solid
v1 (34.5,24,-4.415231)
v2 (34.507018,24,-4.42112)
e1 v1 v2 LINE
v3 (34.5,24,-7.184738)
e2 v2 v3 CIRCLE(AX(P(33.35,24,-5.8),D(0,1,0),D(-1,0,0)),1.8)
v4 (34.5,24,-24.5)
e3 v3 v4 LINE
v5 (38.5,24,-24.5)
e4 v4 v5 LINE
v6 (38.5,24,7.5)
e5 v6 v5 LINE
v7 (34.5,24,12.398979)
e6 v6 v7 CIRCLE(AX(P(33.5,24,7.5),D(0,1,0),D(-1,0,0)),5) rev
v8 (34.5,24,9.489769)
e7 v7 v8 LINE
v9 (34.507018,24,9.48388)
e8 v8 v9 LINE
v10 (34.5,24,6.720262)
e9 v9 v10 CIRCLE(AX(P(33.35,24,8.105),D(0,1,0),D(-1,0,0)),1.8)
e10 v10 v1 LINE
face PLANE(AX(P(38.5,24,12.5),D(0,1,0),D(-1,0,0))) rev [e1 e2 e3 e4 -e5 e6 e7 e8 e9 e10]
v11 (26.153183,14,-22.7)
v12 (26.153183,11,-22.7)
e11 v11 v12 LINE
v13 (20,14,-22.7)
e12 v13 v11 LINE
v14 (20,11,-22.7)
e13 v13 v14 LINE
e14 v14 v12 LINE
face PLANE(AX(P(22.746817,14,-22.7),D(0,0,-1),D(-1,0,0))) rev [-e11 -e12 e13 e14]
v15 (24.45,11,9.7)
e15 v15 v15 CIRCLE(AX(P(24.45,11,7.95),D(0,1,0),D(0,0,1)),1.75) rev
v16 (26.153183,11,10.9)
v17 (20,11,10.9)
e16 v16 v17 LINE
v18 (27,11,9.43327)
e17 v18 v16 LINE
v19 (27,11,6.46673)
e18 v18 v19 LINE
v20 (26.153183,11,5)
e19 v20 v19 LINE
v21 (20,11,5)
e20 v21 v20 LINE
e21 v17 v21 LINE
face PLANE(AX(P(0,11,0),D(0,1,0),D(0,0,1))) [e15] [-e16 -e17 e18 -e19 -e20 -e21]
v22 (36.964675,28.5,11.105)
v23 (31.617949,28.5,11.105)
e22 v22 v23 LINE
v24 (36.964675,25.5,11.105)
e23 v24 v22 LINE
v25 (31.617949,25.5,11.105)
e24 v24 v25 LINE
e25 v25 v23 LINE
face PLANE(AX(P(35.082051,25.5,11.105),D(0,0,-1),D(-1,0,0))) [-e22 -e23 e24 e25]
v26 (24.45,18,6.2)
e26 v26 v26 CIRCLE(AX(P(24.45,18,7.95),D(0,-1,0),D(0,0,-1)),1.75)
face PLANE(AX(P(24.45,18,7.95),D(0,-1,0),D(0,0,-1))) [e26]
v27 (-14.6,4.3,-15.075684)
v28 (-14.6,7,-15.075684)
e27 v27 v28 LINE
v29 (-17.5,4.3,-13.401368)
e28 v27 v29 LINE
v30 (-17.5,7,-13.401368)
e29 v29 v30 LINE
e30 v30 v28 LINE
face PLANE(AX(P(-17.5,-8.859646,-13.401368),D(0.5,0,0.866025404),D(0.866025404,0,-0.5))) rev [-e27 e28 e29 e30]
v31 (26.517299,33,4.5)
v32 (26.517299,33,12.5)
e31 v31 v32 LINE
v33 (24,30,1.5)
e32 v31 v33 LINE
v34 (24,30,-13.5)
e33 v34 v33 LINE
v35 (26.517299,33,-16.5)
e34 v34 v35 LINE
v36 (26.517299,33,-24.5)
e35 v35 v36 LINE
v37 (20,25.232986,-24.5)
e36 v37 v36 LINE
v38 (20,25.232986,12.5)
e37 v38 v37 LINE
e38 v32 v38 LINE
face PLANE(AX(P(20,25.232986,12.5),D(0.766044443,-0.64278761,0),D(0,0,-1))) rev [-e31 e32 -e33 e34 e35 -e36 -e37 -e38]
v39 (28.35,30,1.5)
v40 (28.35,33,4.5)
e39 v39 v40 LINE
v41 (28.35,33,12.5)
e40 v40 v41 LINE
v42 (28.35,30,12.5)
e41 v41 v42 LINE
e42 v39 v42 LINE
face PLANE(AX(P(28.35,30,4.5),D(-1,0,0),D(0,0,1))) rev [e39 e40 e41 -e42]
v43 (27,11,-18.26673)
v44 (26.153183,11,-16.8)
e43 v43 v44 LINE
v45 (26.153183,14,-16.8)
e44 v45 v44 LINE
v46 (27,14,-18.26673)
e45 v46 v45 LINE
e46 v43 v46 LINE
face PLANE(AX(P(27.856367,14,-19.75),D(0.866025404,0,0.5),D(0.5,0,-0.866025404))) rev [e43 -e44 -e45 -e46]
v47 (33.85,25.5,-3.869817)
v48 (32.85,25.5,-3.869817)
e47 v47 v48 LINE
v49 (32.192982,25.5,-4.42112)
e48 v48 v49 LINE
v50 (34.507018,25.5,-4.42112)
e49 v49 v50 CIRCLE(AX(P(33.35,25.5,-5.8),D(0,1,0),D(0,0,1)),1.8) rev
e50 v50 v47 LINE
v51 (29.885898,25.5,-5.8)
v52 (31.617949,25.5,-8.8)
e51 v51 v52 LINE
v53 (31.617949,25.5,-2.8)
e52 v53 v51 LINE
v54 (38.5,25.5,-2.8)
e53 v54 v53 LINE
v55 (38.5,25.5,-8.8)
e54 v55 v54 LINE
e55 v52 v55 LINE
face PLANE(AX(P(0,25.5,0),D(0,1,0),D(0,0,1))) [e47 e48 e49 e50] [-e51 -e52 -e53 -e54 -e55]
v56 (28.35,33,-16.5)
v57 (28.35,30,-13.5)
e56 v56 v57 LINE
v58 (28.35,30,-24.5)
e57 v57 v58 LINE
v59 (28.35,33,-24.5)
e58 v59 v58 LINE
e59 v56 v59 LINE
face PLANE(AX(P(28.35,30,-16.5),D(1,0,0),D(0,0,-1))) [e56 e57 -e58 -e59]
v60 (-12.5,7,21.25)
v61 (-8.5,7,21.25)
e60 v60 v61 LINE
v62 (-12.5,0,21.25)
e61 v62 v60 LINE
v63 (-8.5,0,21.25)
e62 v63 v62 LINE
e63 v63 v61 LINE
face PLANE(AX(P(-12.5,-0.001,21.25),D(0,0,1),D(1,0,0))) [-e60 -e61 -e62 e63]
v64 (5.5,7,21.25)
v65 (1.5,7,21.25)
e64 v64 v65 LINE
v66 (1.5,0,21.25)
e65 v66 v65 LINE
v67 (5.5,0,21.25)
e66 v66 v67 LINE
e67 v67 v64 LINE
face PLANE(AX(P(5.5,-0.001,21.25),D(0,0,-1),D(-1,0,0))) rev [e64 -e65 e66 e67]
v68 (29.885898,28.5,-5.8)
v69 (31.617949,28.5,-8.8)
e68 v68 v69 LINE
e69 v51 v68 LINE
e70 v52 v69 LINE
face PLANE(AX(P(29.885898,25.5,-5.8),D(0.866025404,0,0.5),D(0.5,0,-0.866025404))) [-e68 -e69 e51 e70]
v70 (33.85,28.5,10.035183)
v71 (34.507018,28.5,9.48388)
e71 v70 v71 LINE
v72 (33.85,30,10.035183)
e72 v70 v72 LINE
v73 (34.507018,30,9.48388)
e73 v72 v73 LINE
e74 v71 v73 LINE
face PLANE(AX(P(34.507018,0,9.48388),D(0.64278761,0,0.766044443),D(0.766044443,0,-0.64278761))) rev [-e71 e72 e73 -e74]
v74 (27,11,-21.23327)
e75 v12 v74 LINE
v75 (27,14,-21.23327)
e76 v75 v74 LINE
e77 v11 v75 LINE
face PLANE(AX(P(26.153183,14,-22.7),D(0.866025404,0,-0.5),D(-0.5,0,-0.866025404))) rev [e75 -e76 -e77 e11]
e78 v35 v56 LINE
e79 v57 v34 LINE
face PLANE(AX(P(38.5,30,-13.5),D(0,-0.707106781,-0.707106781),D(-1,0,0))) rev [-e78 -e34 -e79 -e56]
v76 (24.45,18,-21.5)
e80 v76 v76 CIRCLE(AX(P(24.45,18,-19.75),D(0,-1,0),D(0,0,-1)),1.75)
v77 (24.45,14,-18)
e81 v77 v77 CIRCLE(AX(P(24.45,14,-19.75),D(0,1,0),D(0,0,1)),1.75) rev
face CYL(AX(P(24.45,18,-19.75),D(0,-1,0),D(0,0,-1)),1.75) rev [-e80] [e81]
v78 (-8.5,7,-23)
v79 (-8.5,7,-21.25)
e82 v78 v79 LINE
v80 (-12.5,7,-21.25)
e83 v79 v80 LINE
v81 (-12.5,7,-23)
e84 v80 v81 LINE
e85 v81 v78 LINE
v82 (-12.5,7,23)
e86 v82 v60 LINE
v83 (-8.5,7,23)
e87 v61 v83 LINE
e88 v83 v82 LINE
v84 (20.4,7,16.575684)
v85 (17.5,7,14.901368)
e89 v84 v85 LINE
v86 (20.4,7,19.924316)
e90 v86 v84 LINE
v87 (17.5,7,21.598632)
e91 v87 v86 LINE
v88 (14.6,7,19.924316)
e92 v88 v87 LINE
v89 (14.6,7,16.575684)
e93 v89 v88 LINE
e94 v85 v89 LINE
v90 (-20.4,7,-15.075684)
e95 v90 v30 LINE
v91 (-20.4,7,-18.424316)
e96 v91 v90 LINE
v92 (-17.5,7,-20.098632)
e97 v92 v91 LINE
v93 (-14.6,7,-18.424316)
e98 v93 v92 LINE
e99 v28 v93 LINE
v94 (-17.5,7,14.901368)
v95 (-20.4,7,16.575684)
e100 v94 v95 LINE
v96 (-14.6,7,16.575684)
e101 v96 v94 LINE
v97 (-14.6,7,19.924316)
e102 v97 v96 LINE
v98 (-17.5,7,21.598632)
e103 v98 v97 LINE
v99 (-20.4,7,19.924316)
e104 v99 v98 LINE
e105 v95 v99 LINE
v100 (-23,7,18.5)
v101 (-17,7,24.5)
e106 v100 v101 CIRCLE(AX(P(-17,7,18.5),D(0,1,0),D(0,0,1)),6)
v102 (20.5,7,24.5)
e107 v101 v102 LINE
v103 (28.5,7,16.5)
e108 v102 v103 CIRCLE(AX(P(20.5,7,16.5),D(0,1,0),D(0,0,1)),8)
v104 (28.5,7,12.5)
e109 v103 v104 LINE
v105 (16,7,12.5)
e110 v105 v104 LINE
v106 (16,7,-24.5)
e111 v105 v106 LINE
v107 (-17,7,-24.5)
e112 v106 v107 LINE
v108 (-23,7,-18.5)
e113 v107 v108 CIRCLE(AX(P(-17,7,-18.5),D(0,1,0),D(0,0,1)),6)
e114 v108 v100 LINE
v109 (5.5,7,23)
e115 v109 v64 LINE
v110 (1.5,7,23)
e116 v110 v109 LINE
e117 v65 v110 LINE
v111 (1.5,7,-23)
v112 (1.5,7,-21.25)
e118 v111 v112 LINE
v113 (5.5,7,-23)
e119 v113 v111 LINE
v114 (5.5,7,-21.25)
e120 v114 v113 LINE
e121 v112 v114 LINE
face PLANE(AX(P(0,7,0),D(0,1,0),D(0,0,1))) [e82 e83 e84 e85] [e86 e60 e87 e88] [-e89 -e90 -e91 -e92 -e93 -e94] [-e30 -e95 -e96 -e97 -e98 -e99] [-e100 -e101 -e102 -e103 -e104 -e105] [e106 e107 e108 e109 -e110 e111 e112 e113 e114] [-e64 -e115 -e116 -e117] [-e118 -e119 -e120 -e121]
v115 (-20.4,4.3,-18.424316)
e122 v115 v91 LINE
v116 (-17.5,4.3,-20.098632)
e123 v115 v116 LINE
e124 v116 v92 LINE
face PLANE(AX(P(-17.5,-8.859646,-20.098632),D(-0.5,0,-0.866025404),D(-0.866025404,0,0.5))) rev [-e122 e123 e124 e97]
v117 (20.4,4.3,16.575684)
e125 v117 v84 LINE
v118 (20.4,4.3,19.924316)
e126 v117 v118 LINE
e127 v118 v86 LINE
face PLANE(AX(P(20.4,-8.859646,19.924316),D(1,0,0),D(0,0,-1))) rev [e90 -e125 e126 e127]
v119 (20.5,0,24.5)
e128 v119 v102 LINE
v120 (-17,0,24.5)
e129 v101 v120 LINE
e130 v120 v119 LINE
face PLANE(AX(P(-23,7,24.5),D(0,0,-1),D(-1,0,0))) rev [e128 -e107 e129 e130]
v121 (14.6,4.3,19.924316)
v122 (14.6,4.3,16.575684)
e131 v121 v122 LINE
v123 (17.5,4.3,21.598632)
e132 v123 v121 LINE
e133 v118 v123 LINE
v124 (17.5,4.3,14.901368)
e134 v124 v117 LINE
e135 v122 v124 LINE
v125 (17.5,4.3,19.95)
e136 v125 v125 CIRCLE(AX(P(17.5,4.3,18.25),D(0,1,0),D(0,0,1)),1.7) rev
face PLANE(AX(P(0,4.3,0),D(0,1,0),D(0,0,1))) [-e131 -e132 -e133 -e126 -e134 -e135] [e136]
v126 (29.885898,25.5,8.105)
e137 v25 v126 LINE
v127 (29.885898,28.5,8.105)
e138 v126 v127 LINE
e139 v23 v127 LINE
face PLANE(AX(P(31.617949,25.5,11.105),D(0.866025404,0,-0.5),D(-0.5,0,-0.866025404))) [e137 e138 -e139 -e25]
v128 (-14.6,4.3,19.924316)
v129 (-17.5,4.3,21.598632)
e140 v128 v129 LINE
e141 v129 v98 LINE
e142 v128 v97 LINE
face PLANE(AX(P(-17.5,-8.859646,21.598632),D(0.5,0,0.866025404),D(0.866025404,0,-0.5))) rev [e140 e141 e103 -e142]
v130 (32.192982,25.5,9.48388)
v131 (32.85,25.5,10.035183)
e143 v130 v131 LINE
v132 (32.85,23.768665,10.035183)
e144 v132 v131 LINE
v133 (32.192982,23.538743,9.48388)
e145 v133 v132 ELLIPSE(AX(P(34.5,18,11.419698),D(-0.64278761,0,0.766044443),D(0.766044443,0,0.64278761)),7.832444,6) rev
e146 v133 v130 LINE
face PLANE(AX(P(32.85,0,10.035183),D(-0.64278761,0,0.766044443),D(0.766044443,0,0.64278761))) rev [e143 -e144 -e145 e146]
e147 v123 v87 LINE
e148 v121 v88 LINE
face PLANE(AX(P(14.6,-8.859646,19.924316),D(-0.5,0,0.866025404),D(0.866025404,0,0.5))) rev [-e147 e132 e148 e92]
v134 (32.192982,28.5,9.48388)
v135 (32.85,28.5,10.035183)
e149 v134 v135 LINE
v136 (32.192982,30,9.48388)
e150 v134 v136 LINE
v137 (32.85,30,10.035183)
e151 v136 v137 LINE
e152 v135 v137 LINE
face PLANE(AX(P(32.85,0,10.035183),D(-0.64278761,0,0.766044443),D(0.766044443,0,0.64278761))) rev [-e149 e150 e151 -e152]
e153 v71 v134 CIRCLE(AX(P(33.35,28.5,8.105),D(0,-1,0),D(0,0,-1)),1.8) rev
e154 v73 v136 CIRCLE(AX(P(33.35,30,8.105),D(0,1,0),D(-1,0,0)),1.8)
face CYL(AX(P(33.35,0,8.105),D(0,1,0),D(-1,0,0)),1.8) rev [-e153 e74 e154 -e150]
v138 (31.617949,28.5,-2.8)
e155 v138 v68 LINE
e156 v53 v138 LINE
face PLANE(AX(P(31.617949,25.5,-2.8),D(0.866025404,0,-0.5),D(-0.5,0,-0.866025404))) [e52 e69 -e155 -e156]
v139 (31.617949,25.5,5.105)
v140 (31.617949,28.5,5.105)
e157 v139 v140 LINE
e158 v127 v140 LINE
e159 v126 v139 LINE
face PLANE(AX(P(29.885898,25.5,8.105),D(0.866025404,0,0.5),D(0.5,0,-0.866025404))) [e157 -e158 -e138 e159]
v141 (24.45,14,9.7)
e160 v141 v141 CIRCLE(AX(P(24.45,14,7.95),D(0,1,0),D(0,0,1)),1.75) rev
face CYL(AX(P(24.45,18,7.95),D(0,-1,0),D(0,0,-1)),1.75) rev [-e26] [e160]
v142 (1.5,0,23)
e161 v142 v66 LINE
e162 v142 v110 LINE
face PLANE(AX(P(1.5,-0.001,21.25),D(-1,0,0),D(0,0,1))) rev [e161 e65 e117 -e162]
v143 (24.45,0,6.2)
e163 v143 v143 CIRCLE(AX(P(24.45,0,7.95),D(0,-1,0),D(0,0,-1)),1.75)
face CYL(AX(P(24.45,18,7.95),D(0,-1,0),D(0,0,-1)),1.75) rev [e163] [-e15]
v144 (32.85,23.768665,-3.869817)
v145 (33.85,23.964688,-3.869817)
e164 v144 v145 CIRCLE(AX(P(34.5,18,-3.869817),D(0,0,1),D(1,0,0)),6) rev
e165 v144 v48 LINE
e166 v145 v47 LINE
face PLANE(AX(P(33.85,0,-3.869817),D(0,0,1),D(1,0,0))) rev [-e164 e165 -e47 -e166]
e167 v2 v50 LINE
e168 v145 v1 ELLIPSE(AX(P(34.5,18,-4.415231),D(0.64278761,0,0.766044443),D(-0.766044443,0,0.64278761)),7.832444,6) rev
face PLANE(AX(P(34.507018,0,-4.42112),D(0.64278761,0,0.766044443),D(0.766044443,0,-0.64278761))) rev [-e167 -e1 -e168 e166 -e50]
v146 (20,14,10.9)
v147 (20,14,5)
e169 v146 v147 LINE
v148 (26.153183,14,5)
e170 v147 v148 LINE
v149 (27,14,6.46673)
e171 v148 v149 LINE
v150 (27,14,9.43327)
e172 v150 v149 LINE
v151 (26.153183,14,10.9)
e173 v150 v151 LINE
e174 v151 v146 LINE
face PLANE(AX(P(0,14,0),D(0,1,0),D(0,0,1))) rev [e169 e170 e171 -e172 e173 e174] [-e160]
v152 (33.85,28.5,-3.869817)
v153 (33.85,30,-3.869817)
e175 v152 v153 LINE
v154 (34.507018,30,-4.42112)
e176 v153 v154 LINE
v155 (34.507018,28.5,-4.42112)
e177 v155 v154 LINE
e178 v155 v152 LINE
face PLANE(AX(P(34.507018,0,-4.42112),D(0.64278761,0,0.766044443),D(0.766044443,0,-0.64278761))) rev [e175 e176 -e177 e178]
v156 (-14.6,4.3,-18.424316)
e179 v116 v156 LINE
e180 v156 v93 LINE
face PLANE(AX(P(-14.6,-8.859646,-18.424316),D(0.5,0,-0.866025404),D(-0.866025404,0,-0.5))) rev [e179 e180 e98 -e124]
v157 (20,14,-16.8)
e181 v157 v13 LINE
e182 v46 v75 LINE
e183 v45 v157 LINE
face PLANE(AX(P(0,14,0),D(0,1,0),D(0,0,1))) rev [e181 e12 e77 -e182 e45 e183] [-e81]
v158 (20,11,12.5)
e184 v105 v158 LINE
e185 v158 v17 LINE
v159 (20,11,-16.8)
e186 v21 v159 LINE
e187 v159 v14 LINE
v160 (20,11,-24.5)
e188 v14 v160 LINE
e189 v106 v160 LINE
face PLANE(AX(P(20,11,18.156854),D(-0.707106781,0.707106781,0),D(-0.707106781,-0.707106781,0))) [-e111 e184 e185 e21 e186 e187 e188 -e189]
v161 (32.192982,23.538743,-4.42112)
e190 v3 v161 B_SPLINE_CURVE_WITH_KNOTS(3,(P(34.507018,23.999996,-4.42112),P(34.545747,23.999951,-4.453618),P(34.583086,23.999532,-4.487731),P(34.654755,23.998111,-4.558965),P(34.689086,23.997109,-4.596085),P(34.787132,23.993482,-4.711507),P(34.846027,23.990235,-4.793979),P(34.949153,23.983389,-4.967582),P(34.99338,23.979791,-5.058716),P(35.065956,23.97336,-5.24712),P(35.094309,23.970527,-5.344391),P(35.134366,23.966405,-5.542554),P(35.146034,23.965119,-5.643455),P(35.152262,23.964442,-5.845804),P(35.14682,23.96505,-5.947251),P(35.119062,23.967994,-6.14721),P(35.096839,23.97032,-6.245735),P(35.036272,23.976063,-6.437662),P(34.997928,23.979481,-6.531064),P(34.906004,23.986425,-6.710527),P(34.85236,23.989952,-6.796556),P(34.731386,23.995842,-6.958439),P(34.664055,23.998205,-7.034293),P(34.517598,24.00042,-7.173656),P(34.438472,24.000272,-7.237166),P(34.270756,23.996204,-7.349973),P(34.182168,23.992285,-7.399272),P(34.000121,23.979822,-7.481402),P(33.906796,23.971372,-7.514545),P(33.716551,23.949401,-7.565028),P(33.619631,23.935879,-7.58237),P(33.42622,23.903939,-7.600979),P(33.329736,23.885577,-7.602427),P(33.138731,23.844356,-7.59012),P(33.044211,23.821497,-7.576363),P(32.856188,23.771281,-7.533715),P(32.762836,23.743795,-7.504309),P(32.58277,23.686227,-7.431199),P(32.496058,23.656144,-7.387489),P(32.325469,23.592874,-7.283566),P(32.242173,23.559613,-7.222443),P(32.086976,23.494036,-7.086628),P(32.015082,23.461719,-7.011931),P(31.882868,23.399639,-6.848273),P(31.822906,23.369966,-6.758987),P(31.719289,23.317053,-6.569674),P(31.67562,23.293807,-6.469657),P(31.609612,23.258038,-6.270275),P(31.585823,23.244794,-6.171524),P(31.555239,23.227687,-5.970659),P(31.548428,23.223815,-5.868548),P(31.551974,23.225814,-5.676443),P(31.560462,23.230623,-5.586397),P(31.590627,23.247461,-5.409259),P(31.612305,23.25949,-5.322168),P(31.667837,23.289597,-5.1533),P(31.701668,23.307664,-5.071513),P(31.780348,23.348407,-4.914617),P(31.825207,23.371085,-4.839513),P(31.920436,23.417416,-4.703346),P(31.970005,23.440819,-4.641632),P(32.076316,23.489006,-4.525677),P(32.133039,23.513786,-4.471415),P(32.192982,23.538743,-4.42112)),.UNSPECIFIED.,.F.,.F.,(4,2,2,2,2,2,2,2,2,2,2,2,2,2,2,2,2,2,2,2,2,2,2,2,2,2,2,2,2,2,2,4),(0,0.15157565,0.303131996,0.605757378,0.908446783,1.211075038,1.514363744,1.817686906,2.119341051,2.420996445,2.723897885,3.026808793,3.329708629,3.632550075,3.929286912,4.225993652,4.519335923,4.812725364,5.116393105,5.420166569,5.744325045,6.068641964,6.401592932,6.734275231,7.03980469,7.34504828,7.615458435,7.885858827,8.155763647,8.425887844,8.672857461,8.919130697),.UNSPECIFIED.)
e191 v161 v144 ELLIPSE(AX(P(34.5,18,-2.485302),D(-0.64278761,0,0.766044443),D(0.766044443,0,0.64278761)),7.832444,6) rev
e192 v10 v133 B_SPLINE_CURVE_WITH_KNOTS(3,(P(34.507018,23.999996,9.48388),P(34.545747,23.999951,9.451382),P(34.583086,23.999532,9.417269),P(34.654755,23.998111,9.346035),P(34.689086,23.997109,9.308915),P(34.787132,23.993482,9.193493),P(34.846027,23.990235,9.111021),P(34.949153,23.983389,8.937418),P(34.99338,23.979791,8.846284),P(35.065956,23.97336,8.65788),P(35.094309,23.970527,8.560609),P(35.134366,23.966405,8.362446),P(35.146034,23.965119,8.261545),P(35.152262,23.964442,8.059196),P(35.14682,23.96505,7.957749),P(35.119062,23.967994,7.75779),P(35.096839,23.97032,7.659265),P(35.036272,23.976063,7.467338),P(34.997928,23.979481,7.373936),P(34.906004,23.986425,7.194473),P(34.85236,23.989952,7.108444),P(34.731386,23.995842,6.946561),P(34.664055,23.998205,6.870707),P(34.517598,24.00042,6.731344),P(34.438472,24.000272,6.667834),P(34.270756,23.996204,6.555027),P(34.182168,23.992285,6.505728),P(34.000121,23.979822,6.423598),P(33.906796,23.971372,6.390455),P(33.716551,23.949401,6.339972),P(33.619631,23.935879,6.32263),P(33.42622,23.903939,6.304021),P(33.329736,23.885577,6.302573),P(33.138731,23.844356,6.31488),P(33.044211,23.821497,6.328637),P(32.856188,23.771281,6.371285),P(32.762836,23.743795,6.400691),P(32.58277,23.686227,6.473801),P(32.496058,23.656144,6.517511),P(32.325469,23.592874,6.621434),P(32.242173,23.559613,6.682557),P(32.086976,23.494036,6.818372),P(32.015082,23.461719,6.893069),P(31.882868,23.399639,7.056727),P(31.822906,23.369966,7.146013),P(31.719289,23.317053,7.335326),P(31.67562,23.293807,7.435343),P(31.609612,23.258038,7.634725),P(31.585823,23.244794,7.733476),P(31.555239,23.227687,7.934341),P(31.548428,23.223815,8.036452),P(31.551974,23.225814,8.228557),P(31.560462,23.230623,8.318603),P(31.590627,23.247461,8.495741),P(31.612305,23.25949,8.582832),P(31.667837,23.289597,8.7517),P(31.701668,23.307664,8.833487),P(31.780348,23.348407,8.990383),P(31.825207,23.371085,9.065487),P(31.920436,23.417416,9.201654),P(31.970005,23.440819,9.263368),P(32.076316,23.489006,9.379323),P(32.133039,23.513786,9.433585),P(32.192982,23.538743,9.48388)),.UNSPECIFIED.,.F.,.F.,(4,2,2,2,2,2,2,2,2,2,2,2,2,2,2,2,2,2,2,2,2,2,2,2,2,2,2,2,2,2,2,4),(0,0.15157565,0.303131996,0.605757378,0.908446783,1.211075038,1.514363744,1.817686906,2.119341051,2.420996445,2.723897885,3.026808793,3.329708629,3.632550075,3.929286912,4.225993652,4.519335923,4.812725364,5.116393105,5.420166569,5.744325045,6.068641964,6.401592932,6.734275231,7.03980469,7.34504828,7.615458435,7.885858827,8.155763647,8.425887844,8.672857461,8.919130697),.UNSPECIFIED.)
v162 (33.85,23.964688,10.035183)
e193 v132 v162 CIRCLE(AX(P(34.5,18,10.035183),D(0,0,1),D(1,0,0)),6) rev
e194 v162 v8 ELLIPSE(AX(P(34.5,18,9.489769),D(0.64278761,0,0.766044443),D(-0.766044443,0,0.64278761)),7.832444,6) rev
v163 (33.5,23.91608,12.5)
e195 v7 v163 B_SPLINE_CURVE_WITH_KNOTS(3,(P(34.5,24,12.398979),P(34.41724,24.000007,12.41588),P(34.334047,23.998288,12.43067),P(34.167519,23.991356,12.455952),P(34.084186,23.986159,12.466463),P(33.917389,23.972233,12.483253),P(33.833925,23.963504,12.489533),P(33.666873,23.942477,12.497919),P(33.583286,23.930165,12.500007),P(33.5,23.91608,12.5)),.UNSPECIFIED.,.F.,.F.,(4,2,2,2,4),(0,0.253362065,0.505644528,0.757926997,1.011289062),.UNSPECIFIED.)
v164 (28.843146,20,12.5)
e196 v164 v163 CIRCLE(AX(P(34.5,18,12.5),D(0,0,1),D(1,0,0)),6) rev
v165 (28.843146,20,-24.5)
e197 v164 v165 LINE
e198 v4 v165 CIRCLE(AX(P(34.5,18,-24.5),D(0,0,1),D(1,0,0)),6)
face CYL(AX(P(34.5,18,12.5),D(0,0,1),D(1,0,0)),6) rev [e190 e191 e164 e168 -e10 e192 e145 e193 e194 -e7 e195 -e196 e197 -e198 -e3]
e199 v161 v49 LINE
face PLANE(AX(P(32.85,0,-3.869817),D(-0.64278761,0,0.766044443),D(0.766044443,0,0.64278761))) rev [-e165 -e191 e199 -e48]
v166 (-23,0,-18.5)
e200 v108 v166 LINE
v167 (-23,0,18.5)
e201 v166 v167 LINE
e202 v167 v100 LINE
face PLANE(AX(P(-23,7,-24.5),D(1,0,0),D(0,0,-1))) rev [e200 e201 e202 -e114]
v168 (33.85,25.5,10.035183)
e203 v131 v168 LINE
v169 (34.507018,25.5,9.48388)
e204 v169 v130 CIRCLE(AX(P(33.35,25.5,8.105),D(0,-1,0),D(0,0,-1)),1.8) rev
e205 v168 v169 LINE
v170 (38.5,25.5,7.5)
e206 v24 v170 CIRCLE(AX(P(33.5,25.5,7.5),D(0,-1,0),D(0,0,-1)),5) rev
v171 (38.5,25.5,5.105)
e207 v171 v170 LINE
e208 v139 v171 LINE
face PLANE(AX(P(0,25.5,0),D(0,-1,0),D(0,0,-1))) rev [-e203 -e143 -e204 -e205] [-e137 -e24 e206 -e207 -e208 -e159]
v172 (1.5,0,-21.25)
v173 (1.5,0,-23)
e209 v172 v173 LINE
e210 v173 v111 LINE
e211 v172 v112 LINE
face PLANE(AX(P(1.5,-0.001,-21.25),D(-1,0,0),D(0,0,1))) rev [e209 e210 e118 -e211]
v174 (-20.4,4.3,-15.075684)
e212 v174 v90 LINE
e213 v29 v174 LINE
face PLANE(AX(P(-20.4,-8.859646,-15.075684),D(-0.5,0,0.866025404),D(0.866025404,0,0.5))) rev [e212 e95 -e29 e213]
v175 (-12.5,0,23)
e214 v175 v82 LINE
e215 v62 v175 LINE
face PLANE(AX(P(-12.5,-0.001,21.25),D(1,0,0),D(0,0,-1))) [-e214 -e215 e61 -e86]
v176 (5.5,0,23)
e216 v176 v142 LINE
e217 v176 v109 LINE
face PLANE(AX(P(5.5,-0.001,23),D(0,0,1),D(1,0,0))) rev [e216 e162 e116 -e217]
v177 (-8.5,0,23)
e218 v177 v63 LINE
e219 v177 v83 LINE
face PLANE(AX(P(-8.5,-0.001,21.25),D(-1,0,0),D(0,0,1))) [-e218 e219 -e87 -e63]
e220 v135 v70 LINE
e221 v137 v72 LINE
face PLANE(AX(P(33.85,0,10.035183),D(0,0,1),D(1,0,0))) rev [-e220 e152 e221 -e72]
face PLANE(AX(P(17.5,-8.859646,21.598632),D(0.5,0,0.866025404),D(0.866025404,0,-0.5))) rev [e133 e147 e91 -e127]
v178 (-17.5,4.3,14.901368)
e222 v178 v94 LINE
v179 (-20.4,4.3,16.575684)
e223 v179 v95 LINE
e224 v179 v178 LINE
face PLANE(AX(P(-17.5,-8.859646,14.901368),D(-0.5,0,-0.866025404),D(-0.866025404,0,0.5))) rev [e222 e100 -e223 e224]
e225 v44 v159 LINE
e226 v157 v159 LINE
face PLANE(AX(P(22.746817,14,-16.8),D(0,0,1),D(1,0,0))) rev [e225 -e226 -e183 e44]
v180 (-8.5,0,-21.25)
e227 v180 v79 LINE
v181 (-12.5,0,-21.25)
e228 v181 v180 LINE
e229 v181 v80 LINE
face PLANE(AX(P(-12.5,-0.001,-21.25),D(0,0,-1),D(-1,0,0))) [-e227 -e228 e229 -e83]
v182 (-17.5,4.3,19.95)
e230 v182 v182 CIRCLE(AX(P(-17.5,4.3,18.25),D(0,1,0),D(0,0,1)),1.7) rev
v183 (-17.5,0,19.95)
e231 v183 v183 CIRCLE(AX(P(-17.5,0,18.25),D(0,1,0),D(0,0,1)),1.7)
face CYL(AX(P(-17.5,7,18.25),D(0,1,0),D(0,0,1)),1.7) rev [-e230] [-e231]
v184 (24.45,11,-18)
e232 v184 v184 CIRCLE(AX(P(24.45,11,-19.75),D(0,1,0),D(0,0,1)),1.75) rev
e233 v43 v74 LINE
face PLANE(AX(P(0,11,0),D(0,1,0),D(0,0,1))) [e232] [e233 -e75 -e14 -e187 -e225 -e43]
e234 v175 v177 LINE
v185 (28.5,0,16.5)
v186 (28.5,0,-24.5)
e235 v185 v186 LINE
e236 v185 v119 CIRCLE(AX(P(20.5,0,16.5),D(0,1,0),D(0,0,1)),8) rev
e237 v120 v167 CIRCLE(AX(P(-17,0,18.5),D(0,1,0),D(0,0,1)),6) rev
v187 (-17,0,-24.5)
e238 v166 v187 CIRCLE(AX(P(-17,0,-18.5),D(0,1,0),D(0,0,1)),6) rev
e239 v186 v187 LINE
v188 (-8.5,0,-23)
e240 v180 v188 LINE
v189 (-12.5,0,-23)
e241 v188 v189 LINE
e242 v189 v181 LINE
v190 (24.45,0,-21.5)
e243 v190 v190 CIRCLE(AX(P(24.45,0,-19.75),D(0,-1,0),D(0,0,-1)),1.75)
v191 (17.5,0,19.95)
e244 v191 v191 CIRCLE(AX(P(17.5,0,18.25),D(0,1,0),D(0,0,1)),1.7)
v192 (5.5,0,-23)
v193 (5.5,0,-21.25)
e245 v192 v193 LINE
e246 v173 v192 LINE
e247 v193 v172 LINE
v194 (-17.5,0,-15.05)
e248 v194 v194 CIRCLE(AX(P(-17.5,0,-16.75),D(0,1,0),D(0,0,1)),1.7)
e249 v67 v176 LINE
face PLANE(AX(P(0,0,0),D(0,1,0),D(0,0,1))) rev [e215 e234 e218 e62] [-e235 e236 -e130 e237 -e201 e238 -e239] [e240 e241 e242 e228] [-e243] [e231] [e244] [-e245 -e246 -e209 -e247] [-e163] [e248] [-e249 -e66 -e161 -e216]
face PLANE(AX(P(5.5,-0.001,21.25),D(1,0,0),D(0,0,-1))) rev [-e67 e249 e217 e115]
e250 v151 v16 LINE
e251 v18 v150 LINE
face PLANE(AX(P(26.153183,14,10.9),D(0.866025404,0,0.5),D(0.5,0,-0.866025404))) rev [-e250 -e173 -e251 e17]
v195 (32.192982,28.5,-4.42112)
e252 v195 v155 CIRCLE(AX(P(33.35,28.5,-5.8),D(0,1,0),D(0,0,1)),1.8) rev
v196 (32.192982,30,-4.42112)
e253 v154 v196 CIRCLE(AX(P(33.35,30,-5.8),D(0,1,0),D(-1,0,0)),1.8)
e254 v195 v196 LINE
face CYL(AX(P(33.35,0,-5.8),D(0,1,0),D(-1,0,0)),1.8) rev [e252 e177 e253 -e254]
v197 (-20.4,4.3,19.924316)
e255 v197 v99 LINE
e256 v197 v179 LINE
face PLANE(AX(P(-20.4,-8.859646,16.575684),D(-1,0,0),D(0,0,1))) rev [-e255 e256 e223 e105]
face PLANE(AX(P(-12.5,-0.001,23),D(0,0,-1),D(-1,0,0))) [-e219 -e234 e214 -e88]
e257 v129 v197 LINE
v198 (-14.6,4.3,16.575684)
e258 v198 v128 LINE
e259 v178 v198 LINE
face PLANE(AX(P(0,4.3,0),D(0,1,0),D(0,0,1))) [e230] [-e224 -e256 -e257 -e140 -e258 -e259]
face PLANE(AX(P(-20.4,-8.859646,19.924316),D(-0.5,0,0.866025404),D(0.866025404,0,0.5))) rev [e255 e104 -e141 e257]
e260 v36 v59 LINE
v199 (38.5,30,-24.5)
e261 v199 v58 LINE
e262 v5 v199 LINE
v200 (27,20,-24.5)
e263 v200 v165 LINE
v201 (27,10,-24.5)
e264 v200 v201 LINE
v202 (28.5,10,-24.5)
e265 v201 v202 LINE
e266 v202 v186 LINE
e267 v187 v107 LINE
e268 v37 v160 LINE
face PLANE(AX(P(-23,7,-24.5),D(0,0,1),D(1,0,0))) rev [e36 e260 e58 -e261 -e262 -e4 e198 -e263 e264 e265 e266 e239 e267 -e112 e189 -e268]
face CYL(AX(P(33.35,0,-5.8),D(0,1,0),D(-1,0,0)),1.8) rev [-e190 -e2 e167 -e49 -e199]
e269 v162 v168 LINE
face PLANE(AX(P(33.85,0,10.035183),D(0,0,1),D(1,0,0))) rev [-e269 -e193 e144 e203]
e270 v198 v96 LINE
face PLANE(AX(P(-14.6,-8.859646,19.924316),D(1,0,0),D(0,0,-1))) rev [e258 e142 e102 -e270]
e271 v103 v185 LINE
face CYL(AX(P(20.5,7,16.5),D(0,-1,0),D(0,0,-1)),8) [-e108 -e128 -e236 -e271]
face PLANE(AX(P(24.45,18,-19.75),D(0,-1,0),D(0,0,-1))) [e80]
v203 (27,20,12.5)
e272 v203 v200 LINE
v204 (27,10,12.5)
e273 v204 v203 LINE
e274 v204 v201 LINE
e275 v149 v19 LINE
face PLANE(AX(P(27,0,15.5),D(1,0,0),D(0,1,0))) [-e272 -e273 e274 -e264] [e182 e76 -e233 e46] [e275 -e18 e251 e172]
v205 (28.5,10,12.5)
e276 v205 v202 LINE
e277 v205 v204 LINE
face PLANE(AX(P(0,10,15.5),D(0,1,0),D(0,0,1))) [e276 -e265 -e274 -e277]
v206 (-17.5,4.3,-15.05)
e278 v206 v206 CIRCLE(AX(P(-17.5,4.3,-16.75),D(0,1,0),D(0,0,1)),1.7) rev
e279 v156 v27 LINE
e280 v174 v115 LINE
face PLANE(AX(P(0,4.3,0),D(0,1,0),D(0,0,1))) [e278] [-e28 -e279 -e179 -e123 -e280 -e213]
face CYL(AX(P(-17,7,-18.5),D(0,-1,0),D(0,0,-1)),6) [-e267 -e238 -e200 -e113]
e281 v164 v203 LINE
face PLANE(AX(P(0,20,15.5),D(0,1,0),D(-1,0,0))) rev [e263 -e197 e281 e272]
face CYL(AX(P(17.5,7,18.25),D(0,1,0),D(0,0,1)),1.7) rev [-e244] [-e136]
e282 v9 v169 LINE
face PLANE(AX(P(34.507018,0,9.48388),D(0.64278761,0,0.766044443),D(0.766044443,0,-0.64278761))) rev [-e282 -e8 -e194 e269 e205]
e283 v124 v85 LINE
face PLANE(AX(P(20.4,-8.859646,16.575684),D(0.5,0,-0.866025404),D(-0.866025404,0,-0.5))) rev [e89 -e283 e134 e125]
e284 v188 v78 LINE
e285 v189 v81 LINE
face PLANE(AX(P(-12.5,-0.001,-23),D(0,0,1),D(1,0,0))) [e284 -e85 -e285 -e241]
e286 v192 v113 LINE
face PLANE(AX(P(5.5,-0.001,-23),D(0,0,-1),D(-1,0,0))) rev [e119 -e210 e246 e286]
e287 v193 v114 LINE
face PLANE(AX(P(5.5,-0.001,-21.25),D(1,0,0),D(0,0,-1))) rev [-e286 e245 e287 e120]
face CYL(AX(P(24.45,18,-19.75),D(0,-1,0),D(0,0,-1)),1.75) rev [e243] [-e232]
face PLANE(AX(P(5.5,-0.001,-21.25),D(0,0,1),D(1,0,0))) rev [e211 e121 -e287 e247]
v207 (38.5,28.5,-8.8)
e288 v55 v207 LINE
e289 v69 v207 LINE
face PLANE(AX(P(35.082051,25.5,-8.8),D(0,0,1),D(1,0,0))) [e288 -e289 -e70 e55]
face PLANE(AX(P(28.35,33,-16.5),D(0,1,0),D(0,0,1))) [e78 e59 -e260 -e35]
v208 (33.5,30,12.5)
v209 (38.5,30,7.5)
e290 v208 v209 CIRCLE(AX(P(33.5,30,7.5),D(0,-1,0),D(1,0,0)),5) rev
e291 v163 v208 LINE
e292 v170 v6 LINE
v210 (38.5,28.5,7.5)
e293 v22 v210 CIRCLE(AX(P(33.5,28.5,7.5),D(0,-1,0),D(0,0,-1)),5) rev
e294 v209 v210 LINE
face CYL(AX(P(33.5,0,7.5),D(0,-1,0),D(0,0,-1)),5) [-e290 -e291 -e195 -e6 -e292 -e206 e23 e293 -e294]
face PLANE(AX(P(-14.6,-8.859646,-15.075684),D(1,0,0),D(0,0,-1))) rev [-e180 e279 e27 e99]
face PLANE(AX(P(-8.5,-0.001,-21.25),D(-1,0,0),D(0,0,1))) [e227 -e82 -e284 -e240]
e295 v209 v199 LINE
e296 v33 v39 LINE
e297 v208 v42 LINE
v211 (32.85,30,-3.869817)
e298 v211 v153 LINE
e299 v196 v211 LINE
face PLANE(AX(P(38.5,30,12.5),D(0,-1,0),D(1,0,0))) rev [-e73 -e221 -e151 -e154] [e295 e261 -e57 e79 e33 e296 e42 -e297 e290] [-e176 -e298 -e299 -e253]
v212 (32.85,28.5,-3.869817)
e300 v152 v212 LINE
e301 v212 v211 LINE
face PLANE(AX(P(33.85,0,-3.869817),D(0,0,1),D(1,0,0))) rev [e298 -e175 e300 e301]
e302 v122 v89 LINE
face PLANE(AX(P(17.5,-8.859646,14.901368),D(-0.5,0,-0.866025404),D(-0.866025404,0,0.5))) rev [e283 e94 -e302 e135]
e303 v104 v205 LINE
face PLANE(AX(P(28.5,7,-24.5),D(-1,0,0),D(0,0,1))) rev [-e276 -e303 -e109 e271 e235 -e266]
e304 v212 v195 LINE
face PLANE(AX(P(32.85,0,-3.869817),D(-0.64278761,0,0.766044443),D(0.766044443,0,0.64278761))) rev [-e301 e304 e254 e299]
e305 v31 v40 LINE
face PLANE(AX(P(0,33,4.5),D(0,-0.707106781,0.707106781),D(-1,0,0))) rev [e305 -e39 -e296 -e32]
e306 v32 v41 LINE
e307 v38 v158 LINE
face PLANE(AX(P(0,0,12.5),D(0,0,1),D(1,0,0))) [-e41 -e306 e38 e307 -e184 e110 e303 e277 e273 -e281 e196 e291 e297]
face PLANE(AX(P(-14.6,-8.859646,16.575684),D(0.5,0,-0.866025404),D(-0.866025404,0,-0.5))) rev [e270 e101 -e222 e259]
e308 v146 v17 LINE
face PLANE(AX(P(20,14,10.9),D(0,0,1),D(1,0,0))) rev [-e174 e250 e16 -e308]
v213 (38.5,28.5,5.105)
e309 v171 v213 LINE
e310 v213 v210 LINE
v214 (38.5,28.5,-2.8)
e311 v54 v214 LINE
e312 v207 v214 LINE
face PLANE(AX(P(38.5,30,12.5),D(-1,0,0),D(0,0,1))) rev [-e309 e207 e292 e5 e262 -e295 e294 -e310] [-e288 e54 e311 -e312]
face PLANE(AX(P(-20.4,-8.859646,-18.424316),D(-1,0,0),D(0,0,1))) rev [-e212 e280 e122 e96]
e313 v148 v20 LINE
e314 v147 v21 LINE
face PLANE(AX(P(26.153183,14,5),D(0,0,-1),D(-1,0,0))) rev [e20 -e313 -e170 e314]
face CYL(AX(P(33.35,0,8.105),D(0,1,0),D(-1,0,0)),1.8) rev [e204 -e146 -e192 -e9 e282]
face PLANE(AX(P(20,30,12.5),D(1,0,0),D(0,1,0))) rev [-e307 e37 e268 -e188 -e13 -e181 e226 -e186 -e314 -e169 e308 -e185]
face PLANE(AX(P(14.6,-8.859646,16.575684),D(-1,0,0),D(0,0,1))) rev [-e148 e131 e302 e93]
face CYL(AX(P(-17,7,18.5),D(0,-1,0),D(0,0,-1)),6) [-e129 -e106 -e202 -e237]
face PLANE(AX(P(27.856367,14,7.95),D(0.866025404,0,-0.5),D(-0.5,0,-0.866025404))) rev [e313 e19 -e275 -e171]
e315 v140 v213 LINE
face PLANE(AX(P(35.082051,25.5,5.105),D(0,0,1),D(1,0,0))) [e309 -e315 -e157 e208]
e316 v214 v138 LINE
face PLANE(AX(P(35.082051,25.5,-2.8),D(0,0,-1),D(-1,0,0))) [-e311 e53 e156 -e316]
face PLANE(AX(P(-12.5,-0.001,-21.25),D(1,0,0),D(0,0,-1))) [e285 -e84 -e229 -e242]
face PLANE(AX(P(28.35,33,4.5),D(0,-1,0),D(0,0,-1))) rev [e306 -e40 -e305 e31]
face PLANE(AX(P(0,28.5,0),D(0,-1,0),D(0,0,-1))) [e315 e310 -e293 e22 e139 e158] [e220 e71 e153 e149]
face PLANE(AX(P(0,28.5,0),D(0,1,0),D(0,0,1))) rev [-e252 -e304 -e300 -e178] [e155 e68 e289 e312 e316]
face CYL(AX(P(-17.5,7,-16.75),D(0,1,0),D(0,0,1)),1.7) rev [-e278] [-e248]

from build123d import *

# Parameters (mm, degrees)
CROQUIS16_W                  = 51.5
CROQUIS16_H                  = 49
SALIENTE_EXTRUIR3_DEPTH      = 7
SALIENTE_EXTRUIR4_DEPTH      = 37
TALADRO_DE_MARGEN_PARA_M31_D = 3.4
REDONDEO1_R                  = 6
REDONDEO2_R                  = 8
CORTAR_EXTRUIR14_DEPTH       = 2.7
REDONDEO3_R                  = 6
CORTAR_EXTRUIR12_DEPTH       = 55.612269684
REDONDEO11_R                 = 5
SALIENTE_EXTRUIR5_DEPTH      = 37
CHAFL_N3_SIZE                = 4
CHAFL_N3_SIZE2               = 4.76701437
CROQUIS29_R                  = 1.75
CORTAR_EXTRUIR17_DEPTH       = 18
CORTAR_EXTRUIR18_DEPTH       = 3
CORTAR_EXTRUIR20_DEPTH       = 3
CORTAR_EXTRUIR21_REACH       = 53.103
CROQUIS31_W                  = 4
CROQUIS31_H                  = 1.75
SALIENTE_EXTRUIR10_DEPTH     = 8
CHAFL_N7_SIZE                = 3
CORTAR_EXTRUIR22_START       = -40
CORTAR_EXTRUIR22_DEPTH       = 40


with BuildPart() as part:
    # Croquis16 → Saliente-Extruir3 (new body)
    with BuildSketch(Plane(origin=(0, 0, 0), x_dir=(1, 0, 0), z_dir=(0, 1, 0))):
        with Locations((2.75, 0)):
            Rectangle(CROQUIS16_W, CROQUIS16_H)
    extrude(amount=SALIENTE_EXTRUIR3_DEPTH)

    # Croquis17 → Saliente-Extruir4 (add)
    with BuildSketch(Plane.XY.offset(-24.5)):
        Polygon((38.5, 30), (38.5, 24), (28.5, 24), (28.5, 7), (20, 7), (20, 30), align=None)
    extrude(amount=SALIENTE_EXTRUIR4_DEPTH)

    # Taladro de margen para M31 (through all)
    with Locations(Plane(origin=(0, 7, 0), x_dir=(1, 0, 0), z_dir=(0, 1, 0))):
        with Locations((-17.5, 16.75), (17.5, -18.25), (-17.5, -18.25)):
            Hole(TALADRO_DE_MARGEN_PARA_M31_D / 2)

    # Redondeo1
    redondeo1_edges = [part.edges().sort_by_distance(p)[0] for p in [
        (-23, 3.5, -24.5),
        (-23, 3.5, 24.5),
    ]]
    fillet(redondeo1_edges, radius=REDONDEO1_R)

    # Redondeo2
    redondeo2_edges = [part.edges().sort_by_distance(p)[0] for p in [
        (28.5, 3.5, 24.5),
    ]]
    fillet(redondeo2_edges, radius=REDONDEO2_R)

    # Croquis24 → Cortar-Extruir14 (cut)
    with BuildSketch(Plane(origin=(0, 7, 0), x_dir=(1, 0, 0), z_dir=(0, 1, 0))):
        Polygon((-17.5, -21.598631561), (-14.6, -19.924315781), (-14.6, -16.575684219), (-17.5, -14.901368439), (-20.4, -16.575684219), (-20.4, -19.924315781), align=None)
        Polygon((17.5, -21.598631561), (20.4, -19.924315781), (20.4, -16.575684219), (17.5, -14.901368439), (14.6, -16.575684219), (14.6, -19.924315781), align=None)
        Polygon((-17.5, 20.098631561), (-20.4, 18.424315781), (-20.4, 15.075684219), (-17.5, 13.401368439), (-14.6, 15.075684219), (-14.6, 18.424315781), align=None)
    extrude(amount=-CORTAR_EXTRUIR14_DEPTH, mode=Mode.SUBTRACT)

    # Redondeo3
    redondeo3_edges = [part.edges().sort_by_distance(p)[0] for p in [
        (28.5, 24, -6),
    ]]
    fillet(redondeo3_edges, radius=REDONDEO3_R)

    # Croquis21 → Cortar-Extruir12 (cut, through all)
    with BuildSketch(Plane(origin=(0, 30, 0), x_dir=(1, 0, 0), z_dir=(0, 1, 0))):
        with BuildLine():
            Line((34.507017697, 4.421120002), (33.85, 3.869816695))
            Line((33.85, 3.869816695), (32.85, 3.869816695))
            Line((32.85, 3.869816695), (32.192982303, 4.421120002))
            ThreePointArc((32.192982303, 4.421120002), (33.35, 7.6), (34.507017697, 4.421120002))
        make_face()
        with BuildLine():
            Line((33.85, -10.035183305), (32.85, -10.035183305))
            Line((32.85, -10.035183305), (32.192982303, -9.483879998))
            ThreePointArc((32.192982303, -9.483879998), (33.35, -6.305), (34.507017697, -9.483879998))
            Line((34.507017697, -9.483879998), (33.85, -10.035183305))
        make_face()
    extrude(amount=-CORTAR_EXTRUIR12_DEPTH, mode=Mode.SUBTRACT)

    # Redondeo11
    redondeo11_edges = [part.edges().sort_by_distance(p)[0] for p in [
        (38.5, 27, 12.5),
    ]]
    fillet(redondeo11_edges, radius=REDONDEO11_R)

    # Croquis26 → Saliente-Extruir5 (add)
    with BuildSketch(Plane(origin=(0, 0, -24.5), x_dir=(-1, 0, 0), z_dir=(0, 0, -1))):
        Polygon((-20, 11), (-16, 7), (-20, 7), align=None)
    extrude(amount=-SALIENTE_EXTRUIR5_DEPTH)

    # Chaflán3
    chafl_n3_edges = [part.edges().sort_by_distance(p)[0] for p in [
        (20, 30, -6),
    ]]
    chafl_n3_side = [part.faces().sort_by_distance(p)[0] for p in [
        (29.053844861, 30, -6.369586264),
    ]]
    chamfer(chafl_n3_edges, length=CHAFL_N3_SIZE, length2=CHAFL_N3_SIZE2, reference=chafl_n3_side[0])

    # Croquis29 → Cortar-Extruir17 (cut)
    with BuildSketch(Plane.XZ):
        with Locations(Location((24.45, -19.75, 0), (0, 0, 270))):
            Circle(CROQUIS29_R)
        with Locations(Location((24.45, 7.95, 0), (0, 0, 270))):
            Circle(CROQUIS29_R)
    extrude(amount=-CORTAR_EXTRUIR17_DEPTH, mode=Mode.SUBTRACT)

    # Croquis30 → Cortar-Extruir18 (cut)
    with BuildSketch(Plane(origin=(0, 11, 0), x_dir=(-1, 0, 0), z_dir=(0, -1, 0))):
        Polygon((-22.746816706, 16.8), (-20, 16.8), (-20, 22.7), (-22.746816706, 22.7), (-26.153183294, 22.7), (-27.856366588, 19.75), (-26.153183294, 16.8), align=None)
        Polygon((-20, -10.9), (-22.746816706, -10.9), (-26.153183294, -10.9), (-27.856366588, -7.95), (-26.153183294, -5), (-22.746816706, -5), (-20, -5), align=None)
    extrude(amount=-CORTAR_EXTRUIR18_DEPTH, mode=Mode.SUBTRACT)

    # Croquis25 → Cortar-Extruir20 (cut)
    with BuildSketch(Plane.XZ.offset(-28.5)):
        Polygon((35.082050808, -2.8), (38.5, -2.8), (38.5, -8.8), (35.082050808, -8.8), (31.617949192, -8.8), (29.885898385, -5.8), (31.617949192, -2.8), align=None)
        Polygon((31.617949192, 11.105), (29.885898385, 8.105), (31.617949192, 5.105), (35.082050808, 5.105), (40.5, 5.105), (40.5, 11.105), (35.082050808, 11.105), align=None)
    extrude(amount=CORTAR_EXTRUIR20_DEPTH, mode=Mode.SUBTRACT)

    # Croquis31 → Cortar-Extruir21 (cut, up to next)
    with BuildSketch(Plane(origin=(0, 7, 0), x_dir=(1, 0, 0), z_dir=(0, 1, 0)), mode=Mode.PRIVATE) as cortar_extruir21_sk1:
        with Locations((3.5, 22.125)):
            Rectangle(CROQUIS31_W, CROQUIS31_H)
    cortar_extruir21_tool1 = extrude(cortar_extruir21_sk1.sketch, amount=-CORTAR_EXTRUIR21_REACH, mode=Mode.PRIVATE) & part.part
    # Croquis31 → Cortar-Extruir21 (cut, up to next)
    with BuildSketch(Plane(origin=(0, 7, 0), x_dir=(1, 0, 0), z_dir=(0, 1, 0)), mode=Mode.PRIVATE) as cortar_extruir21_sk2:
        with Locations((3.5, -22.125)):
            Rectangle(CROQUIS31_W, CROQUIS31_H)
    cortar_extruir21_tool2 = extrude(cortar_extruir21_sk2.sketch, amount=-CORTAR_EXTRUIR21_REACH, mode=Mode.PRIVATE) & part.part
    cortar_extruir21_1 = cortar_extruir21_tool1.solids().sort_by_distance((3.5, 7, -22.125))[0]
    add(cortar_extruir21_1, mode=Mode.SUBTRACT)
    cortar_extruir21_2 = cortar_extruir21_tool2.solids().sort_by_distance((3.5, 7, 22.125))[0]
    add(cortar_extruir21_2, mode=Mode.SUBTRACT)
    cortar_extruir21 = cortar_extruir21_1 + cortar_extruir21_2  # Cortar-Extruir21 as one shape, for the pattern or mirror that repeats it

    # Croquis38 → Saliente-Extruir10 (add)
    with BuildSketch(Plane(origin=(0, 0, -24.5), x_dir=(-1, 0, 0), z_dir=(0, 0, -1))):
        Polygon((-24, 30), (-28.35, 30), (-28.35, 33), (-26.517298894, 33), align=None)
    saliente_extruir10 = extrude(amount=-SALIENTE_EXTRUIR10_DEPTH)

    # Simetría3: Saliente-Extruir10 across plane
    add(saliente_extruir10.mirror(Plane(origin=(0, 0, -6), x_dir=(1, 0, 0), z_dir=(0, 0, -1))))

    # Chaflán7
    chafl_n7_edges = [part.edges().sort_by_distance(p)[0] for p in [
        (26.175, 30, 4.5),
        (26.175, 30, -16.5),
    ]]
    chamfer(chafl_n7_edges, length=CHAFL_N7_SIZE - 0.0001)  # a hair under: the kernel refuses the full size

    # Simetría4: Cortar-Extruir21 across plane
    add(cortar_extruir21.mirror(Plane(origin=(-3.5, 0, 0), x_dir=(0, 0, 1), z_dir=(1, 0, 0))), mode=Mode.SUBTRACT)

    # Croquis39 → Cortar-Extruir22 (cut)
    with BuildSketch(Plane(origin=(0, 0, -24.5), x_dir=(-1, 0, 0), z_dir=(0, 0, -1)).offset(CORTAR_EXTRUIR22_START)):
        with BuildLine():
            Line((-28.5, 10), (-28.5, 18))
            ThreePointArc((-28.5, 18), (-28.586408642, 19.014611872), (-28.843145751, 20))
            Line((-28.843145751, 20), (-30, 20))
            Line((-30, 20), (-30, 10))
            Line((-30, 10), (-28.5, 10))
        make_face()
        Polygon((-27, 20), (-28.5, 20), (-28.5, 18), (-28.5, 10), (-27, 10), align=None)
        with BuildLine():
            Line((-28.5, 18), (-28.5, 20))
            Line((-28.5, 20), (-28.843145751, 20))
            ThreePointArc((-28.843145751, 20), (-28.586408642, 19.014611872), (-28.5, 18))
        make_face()
    extrude(amount=CORTAR_EXTRUIR22_DEPTH, mode=Mode.SUBTRACT)


solid = part.part
